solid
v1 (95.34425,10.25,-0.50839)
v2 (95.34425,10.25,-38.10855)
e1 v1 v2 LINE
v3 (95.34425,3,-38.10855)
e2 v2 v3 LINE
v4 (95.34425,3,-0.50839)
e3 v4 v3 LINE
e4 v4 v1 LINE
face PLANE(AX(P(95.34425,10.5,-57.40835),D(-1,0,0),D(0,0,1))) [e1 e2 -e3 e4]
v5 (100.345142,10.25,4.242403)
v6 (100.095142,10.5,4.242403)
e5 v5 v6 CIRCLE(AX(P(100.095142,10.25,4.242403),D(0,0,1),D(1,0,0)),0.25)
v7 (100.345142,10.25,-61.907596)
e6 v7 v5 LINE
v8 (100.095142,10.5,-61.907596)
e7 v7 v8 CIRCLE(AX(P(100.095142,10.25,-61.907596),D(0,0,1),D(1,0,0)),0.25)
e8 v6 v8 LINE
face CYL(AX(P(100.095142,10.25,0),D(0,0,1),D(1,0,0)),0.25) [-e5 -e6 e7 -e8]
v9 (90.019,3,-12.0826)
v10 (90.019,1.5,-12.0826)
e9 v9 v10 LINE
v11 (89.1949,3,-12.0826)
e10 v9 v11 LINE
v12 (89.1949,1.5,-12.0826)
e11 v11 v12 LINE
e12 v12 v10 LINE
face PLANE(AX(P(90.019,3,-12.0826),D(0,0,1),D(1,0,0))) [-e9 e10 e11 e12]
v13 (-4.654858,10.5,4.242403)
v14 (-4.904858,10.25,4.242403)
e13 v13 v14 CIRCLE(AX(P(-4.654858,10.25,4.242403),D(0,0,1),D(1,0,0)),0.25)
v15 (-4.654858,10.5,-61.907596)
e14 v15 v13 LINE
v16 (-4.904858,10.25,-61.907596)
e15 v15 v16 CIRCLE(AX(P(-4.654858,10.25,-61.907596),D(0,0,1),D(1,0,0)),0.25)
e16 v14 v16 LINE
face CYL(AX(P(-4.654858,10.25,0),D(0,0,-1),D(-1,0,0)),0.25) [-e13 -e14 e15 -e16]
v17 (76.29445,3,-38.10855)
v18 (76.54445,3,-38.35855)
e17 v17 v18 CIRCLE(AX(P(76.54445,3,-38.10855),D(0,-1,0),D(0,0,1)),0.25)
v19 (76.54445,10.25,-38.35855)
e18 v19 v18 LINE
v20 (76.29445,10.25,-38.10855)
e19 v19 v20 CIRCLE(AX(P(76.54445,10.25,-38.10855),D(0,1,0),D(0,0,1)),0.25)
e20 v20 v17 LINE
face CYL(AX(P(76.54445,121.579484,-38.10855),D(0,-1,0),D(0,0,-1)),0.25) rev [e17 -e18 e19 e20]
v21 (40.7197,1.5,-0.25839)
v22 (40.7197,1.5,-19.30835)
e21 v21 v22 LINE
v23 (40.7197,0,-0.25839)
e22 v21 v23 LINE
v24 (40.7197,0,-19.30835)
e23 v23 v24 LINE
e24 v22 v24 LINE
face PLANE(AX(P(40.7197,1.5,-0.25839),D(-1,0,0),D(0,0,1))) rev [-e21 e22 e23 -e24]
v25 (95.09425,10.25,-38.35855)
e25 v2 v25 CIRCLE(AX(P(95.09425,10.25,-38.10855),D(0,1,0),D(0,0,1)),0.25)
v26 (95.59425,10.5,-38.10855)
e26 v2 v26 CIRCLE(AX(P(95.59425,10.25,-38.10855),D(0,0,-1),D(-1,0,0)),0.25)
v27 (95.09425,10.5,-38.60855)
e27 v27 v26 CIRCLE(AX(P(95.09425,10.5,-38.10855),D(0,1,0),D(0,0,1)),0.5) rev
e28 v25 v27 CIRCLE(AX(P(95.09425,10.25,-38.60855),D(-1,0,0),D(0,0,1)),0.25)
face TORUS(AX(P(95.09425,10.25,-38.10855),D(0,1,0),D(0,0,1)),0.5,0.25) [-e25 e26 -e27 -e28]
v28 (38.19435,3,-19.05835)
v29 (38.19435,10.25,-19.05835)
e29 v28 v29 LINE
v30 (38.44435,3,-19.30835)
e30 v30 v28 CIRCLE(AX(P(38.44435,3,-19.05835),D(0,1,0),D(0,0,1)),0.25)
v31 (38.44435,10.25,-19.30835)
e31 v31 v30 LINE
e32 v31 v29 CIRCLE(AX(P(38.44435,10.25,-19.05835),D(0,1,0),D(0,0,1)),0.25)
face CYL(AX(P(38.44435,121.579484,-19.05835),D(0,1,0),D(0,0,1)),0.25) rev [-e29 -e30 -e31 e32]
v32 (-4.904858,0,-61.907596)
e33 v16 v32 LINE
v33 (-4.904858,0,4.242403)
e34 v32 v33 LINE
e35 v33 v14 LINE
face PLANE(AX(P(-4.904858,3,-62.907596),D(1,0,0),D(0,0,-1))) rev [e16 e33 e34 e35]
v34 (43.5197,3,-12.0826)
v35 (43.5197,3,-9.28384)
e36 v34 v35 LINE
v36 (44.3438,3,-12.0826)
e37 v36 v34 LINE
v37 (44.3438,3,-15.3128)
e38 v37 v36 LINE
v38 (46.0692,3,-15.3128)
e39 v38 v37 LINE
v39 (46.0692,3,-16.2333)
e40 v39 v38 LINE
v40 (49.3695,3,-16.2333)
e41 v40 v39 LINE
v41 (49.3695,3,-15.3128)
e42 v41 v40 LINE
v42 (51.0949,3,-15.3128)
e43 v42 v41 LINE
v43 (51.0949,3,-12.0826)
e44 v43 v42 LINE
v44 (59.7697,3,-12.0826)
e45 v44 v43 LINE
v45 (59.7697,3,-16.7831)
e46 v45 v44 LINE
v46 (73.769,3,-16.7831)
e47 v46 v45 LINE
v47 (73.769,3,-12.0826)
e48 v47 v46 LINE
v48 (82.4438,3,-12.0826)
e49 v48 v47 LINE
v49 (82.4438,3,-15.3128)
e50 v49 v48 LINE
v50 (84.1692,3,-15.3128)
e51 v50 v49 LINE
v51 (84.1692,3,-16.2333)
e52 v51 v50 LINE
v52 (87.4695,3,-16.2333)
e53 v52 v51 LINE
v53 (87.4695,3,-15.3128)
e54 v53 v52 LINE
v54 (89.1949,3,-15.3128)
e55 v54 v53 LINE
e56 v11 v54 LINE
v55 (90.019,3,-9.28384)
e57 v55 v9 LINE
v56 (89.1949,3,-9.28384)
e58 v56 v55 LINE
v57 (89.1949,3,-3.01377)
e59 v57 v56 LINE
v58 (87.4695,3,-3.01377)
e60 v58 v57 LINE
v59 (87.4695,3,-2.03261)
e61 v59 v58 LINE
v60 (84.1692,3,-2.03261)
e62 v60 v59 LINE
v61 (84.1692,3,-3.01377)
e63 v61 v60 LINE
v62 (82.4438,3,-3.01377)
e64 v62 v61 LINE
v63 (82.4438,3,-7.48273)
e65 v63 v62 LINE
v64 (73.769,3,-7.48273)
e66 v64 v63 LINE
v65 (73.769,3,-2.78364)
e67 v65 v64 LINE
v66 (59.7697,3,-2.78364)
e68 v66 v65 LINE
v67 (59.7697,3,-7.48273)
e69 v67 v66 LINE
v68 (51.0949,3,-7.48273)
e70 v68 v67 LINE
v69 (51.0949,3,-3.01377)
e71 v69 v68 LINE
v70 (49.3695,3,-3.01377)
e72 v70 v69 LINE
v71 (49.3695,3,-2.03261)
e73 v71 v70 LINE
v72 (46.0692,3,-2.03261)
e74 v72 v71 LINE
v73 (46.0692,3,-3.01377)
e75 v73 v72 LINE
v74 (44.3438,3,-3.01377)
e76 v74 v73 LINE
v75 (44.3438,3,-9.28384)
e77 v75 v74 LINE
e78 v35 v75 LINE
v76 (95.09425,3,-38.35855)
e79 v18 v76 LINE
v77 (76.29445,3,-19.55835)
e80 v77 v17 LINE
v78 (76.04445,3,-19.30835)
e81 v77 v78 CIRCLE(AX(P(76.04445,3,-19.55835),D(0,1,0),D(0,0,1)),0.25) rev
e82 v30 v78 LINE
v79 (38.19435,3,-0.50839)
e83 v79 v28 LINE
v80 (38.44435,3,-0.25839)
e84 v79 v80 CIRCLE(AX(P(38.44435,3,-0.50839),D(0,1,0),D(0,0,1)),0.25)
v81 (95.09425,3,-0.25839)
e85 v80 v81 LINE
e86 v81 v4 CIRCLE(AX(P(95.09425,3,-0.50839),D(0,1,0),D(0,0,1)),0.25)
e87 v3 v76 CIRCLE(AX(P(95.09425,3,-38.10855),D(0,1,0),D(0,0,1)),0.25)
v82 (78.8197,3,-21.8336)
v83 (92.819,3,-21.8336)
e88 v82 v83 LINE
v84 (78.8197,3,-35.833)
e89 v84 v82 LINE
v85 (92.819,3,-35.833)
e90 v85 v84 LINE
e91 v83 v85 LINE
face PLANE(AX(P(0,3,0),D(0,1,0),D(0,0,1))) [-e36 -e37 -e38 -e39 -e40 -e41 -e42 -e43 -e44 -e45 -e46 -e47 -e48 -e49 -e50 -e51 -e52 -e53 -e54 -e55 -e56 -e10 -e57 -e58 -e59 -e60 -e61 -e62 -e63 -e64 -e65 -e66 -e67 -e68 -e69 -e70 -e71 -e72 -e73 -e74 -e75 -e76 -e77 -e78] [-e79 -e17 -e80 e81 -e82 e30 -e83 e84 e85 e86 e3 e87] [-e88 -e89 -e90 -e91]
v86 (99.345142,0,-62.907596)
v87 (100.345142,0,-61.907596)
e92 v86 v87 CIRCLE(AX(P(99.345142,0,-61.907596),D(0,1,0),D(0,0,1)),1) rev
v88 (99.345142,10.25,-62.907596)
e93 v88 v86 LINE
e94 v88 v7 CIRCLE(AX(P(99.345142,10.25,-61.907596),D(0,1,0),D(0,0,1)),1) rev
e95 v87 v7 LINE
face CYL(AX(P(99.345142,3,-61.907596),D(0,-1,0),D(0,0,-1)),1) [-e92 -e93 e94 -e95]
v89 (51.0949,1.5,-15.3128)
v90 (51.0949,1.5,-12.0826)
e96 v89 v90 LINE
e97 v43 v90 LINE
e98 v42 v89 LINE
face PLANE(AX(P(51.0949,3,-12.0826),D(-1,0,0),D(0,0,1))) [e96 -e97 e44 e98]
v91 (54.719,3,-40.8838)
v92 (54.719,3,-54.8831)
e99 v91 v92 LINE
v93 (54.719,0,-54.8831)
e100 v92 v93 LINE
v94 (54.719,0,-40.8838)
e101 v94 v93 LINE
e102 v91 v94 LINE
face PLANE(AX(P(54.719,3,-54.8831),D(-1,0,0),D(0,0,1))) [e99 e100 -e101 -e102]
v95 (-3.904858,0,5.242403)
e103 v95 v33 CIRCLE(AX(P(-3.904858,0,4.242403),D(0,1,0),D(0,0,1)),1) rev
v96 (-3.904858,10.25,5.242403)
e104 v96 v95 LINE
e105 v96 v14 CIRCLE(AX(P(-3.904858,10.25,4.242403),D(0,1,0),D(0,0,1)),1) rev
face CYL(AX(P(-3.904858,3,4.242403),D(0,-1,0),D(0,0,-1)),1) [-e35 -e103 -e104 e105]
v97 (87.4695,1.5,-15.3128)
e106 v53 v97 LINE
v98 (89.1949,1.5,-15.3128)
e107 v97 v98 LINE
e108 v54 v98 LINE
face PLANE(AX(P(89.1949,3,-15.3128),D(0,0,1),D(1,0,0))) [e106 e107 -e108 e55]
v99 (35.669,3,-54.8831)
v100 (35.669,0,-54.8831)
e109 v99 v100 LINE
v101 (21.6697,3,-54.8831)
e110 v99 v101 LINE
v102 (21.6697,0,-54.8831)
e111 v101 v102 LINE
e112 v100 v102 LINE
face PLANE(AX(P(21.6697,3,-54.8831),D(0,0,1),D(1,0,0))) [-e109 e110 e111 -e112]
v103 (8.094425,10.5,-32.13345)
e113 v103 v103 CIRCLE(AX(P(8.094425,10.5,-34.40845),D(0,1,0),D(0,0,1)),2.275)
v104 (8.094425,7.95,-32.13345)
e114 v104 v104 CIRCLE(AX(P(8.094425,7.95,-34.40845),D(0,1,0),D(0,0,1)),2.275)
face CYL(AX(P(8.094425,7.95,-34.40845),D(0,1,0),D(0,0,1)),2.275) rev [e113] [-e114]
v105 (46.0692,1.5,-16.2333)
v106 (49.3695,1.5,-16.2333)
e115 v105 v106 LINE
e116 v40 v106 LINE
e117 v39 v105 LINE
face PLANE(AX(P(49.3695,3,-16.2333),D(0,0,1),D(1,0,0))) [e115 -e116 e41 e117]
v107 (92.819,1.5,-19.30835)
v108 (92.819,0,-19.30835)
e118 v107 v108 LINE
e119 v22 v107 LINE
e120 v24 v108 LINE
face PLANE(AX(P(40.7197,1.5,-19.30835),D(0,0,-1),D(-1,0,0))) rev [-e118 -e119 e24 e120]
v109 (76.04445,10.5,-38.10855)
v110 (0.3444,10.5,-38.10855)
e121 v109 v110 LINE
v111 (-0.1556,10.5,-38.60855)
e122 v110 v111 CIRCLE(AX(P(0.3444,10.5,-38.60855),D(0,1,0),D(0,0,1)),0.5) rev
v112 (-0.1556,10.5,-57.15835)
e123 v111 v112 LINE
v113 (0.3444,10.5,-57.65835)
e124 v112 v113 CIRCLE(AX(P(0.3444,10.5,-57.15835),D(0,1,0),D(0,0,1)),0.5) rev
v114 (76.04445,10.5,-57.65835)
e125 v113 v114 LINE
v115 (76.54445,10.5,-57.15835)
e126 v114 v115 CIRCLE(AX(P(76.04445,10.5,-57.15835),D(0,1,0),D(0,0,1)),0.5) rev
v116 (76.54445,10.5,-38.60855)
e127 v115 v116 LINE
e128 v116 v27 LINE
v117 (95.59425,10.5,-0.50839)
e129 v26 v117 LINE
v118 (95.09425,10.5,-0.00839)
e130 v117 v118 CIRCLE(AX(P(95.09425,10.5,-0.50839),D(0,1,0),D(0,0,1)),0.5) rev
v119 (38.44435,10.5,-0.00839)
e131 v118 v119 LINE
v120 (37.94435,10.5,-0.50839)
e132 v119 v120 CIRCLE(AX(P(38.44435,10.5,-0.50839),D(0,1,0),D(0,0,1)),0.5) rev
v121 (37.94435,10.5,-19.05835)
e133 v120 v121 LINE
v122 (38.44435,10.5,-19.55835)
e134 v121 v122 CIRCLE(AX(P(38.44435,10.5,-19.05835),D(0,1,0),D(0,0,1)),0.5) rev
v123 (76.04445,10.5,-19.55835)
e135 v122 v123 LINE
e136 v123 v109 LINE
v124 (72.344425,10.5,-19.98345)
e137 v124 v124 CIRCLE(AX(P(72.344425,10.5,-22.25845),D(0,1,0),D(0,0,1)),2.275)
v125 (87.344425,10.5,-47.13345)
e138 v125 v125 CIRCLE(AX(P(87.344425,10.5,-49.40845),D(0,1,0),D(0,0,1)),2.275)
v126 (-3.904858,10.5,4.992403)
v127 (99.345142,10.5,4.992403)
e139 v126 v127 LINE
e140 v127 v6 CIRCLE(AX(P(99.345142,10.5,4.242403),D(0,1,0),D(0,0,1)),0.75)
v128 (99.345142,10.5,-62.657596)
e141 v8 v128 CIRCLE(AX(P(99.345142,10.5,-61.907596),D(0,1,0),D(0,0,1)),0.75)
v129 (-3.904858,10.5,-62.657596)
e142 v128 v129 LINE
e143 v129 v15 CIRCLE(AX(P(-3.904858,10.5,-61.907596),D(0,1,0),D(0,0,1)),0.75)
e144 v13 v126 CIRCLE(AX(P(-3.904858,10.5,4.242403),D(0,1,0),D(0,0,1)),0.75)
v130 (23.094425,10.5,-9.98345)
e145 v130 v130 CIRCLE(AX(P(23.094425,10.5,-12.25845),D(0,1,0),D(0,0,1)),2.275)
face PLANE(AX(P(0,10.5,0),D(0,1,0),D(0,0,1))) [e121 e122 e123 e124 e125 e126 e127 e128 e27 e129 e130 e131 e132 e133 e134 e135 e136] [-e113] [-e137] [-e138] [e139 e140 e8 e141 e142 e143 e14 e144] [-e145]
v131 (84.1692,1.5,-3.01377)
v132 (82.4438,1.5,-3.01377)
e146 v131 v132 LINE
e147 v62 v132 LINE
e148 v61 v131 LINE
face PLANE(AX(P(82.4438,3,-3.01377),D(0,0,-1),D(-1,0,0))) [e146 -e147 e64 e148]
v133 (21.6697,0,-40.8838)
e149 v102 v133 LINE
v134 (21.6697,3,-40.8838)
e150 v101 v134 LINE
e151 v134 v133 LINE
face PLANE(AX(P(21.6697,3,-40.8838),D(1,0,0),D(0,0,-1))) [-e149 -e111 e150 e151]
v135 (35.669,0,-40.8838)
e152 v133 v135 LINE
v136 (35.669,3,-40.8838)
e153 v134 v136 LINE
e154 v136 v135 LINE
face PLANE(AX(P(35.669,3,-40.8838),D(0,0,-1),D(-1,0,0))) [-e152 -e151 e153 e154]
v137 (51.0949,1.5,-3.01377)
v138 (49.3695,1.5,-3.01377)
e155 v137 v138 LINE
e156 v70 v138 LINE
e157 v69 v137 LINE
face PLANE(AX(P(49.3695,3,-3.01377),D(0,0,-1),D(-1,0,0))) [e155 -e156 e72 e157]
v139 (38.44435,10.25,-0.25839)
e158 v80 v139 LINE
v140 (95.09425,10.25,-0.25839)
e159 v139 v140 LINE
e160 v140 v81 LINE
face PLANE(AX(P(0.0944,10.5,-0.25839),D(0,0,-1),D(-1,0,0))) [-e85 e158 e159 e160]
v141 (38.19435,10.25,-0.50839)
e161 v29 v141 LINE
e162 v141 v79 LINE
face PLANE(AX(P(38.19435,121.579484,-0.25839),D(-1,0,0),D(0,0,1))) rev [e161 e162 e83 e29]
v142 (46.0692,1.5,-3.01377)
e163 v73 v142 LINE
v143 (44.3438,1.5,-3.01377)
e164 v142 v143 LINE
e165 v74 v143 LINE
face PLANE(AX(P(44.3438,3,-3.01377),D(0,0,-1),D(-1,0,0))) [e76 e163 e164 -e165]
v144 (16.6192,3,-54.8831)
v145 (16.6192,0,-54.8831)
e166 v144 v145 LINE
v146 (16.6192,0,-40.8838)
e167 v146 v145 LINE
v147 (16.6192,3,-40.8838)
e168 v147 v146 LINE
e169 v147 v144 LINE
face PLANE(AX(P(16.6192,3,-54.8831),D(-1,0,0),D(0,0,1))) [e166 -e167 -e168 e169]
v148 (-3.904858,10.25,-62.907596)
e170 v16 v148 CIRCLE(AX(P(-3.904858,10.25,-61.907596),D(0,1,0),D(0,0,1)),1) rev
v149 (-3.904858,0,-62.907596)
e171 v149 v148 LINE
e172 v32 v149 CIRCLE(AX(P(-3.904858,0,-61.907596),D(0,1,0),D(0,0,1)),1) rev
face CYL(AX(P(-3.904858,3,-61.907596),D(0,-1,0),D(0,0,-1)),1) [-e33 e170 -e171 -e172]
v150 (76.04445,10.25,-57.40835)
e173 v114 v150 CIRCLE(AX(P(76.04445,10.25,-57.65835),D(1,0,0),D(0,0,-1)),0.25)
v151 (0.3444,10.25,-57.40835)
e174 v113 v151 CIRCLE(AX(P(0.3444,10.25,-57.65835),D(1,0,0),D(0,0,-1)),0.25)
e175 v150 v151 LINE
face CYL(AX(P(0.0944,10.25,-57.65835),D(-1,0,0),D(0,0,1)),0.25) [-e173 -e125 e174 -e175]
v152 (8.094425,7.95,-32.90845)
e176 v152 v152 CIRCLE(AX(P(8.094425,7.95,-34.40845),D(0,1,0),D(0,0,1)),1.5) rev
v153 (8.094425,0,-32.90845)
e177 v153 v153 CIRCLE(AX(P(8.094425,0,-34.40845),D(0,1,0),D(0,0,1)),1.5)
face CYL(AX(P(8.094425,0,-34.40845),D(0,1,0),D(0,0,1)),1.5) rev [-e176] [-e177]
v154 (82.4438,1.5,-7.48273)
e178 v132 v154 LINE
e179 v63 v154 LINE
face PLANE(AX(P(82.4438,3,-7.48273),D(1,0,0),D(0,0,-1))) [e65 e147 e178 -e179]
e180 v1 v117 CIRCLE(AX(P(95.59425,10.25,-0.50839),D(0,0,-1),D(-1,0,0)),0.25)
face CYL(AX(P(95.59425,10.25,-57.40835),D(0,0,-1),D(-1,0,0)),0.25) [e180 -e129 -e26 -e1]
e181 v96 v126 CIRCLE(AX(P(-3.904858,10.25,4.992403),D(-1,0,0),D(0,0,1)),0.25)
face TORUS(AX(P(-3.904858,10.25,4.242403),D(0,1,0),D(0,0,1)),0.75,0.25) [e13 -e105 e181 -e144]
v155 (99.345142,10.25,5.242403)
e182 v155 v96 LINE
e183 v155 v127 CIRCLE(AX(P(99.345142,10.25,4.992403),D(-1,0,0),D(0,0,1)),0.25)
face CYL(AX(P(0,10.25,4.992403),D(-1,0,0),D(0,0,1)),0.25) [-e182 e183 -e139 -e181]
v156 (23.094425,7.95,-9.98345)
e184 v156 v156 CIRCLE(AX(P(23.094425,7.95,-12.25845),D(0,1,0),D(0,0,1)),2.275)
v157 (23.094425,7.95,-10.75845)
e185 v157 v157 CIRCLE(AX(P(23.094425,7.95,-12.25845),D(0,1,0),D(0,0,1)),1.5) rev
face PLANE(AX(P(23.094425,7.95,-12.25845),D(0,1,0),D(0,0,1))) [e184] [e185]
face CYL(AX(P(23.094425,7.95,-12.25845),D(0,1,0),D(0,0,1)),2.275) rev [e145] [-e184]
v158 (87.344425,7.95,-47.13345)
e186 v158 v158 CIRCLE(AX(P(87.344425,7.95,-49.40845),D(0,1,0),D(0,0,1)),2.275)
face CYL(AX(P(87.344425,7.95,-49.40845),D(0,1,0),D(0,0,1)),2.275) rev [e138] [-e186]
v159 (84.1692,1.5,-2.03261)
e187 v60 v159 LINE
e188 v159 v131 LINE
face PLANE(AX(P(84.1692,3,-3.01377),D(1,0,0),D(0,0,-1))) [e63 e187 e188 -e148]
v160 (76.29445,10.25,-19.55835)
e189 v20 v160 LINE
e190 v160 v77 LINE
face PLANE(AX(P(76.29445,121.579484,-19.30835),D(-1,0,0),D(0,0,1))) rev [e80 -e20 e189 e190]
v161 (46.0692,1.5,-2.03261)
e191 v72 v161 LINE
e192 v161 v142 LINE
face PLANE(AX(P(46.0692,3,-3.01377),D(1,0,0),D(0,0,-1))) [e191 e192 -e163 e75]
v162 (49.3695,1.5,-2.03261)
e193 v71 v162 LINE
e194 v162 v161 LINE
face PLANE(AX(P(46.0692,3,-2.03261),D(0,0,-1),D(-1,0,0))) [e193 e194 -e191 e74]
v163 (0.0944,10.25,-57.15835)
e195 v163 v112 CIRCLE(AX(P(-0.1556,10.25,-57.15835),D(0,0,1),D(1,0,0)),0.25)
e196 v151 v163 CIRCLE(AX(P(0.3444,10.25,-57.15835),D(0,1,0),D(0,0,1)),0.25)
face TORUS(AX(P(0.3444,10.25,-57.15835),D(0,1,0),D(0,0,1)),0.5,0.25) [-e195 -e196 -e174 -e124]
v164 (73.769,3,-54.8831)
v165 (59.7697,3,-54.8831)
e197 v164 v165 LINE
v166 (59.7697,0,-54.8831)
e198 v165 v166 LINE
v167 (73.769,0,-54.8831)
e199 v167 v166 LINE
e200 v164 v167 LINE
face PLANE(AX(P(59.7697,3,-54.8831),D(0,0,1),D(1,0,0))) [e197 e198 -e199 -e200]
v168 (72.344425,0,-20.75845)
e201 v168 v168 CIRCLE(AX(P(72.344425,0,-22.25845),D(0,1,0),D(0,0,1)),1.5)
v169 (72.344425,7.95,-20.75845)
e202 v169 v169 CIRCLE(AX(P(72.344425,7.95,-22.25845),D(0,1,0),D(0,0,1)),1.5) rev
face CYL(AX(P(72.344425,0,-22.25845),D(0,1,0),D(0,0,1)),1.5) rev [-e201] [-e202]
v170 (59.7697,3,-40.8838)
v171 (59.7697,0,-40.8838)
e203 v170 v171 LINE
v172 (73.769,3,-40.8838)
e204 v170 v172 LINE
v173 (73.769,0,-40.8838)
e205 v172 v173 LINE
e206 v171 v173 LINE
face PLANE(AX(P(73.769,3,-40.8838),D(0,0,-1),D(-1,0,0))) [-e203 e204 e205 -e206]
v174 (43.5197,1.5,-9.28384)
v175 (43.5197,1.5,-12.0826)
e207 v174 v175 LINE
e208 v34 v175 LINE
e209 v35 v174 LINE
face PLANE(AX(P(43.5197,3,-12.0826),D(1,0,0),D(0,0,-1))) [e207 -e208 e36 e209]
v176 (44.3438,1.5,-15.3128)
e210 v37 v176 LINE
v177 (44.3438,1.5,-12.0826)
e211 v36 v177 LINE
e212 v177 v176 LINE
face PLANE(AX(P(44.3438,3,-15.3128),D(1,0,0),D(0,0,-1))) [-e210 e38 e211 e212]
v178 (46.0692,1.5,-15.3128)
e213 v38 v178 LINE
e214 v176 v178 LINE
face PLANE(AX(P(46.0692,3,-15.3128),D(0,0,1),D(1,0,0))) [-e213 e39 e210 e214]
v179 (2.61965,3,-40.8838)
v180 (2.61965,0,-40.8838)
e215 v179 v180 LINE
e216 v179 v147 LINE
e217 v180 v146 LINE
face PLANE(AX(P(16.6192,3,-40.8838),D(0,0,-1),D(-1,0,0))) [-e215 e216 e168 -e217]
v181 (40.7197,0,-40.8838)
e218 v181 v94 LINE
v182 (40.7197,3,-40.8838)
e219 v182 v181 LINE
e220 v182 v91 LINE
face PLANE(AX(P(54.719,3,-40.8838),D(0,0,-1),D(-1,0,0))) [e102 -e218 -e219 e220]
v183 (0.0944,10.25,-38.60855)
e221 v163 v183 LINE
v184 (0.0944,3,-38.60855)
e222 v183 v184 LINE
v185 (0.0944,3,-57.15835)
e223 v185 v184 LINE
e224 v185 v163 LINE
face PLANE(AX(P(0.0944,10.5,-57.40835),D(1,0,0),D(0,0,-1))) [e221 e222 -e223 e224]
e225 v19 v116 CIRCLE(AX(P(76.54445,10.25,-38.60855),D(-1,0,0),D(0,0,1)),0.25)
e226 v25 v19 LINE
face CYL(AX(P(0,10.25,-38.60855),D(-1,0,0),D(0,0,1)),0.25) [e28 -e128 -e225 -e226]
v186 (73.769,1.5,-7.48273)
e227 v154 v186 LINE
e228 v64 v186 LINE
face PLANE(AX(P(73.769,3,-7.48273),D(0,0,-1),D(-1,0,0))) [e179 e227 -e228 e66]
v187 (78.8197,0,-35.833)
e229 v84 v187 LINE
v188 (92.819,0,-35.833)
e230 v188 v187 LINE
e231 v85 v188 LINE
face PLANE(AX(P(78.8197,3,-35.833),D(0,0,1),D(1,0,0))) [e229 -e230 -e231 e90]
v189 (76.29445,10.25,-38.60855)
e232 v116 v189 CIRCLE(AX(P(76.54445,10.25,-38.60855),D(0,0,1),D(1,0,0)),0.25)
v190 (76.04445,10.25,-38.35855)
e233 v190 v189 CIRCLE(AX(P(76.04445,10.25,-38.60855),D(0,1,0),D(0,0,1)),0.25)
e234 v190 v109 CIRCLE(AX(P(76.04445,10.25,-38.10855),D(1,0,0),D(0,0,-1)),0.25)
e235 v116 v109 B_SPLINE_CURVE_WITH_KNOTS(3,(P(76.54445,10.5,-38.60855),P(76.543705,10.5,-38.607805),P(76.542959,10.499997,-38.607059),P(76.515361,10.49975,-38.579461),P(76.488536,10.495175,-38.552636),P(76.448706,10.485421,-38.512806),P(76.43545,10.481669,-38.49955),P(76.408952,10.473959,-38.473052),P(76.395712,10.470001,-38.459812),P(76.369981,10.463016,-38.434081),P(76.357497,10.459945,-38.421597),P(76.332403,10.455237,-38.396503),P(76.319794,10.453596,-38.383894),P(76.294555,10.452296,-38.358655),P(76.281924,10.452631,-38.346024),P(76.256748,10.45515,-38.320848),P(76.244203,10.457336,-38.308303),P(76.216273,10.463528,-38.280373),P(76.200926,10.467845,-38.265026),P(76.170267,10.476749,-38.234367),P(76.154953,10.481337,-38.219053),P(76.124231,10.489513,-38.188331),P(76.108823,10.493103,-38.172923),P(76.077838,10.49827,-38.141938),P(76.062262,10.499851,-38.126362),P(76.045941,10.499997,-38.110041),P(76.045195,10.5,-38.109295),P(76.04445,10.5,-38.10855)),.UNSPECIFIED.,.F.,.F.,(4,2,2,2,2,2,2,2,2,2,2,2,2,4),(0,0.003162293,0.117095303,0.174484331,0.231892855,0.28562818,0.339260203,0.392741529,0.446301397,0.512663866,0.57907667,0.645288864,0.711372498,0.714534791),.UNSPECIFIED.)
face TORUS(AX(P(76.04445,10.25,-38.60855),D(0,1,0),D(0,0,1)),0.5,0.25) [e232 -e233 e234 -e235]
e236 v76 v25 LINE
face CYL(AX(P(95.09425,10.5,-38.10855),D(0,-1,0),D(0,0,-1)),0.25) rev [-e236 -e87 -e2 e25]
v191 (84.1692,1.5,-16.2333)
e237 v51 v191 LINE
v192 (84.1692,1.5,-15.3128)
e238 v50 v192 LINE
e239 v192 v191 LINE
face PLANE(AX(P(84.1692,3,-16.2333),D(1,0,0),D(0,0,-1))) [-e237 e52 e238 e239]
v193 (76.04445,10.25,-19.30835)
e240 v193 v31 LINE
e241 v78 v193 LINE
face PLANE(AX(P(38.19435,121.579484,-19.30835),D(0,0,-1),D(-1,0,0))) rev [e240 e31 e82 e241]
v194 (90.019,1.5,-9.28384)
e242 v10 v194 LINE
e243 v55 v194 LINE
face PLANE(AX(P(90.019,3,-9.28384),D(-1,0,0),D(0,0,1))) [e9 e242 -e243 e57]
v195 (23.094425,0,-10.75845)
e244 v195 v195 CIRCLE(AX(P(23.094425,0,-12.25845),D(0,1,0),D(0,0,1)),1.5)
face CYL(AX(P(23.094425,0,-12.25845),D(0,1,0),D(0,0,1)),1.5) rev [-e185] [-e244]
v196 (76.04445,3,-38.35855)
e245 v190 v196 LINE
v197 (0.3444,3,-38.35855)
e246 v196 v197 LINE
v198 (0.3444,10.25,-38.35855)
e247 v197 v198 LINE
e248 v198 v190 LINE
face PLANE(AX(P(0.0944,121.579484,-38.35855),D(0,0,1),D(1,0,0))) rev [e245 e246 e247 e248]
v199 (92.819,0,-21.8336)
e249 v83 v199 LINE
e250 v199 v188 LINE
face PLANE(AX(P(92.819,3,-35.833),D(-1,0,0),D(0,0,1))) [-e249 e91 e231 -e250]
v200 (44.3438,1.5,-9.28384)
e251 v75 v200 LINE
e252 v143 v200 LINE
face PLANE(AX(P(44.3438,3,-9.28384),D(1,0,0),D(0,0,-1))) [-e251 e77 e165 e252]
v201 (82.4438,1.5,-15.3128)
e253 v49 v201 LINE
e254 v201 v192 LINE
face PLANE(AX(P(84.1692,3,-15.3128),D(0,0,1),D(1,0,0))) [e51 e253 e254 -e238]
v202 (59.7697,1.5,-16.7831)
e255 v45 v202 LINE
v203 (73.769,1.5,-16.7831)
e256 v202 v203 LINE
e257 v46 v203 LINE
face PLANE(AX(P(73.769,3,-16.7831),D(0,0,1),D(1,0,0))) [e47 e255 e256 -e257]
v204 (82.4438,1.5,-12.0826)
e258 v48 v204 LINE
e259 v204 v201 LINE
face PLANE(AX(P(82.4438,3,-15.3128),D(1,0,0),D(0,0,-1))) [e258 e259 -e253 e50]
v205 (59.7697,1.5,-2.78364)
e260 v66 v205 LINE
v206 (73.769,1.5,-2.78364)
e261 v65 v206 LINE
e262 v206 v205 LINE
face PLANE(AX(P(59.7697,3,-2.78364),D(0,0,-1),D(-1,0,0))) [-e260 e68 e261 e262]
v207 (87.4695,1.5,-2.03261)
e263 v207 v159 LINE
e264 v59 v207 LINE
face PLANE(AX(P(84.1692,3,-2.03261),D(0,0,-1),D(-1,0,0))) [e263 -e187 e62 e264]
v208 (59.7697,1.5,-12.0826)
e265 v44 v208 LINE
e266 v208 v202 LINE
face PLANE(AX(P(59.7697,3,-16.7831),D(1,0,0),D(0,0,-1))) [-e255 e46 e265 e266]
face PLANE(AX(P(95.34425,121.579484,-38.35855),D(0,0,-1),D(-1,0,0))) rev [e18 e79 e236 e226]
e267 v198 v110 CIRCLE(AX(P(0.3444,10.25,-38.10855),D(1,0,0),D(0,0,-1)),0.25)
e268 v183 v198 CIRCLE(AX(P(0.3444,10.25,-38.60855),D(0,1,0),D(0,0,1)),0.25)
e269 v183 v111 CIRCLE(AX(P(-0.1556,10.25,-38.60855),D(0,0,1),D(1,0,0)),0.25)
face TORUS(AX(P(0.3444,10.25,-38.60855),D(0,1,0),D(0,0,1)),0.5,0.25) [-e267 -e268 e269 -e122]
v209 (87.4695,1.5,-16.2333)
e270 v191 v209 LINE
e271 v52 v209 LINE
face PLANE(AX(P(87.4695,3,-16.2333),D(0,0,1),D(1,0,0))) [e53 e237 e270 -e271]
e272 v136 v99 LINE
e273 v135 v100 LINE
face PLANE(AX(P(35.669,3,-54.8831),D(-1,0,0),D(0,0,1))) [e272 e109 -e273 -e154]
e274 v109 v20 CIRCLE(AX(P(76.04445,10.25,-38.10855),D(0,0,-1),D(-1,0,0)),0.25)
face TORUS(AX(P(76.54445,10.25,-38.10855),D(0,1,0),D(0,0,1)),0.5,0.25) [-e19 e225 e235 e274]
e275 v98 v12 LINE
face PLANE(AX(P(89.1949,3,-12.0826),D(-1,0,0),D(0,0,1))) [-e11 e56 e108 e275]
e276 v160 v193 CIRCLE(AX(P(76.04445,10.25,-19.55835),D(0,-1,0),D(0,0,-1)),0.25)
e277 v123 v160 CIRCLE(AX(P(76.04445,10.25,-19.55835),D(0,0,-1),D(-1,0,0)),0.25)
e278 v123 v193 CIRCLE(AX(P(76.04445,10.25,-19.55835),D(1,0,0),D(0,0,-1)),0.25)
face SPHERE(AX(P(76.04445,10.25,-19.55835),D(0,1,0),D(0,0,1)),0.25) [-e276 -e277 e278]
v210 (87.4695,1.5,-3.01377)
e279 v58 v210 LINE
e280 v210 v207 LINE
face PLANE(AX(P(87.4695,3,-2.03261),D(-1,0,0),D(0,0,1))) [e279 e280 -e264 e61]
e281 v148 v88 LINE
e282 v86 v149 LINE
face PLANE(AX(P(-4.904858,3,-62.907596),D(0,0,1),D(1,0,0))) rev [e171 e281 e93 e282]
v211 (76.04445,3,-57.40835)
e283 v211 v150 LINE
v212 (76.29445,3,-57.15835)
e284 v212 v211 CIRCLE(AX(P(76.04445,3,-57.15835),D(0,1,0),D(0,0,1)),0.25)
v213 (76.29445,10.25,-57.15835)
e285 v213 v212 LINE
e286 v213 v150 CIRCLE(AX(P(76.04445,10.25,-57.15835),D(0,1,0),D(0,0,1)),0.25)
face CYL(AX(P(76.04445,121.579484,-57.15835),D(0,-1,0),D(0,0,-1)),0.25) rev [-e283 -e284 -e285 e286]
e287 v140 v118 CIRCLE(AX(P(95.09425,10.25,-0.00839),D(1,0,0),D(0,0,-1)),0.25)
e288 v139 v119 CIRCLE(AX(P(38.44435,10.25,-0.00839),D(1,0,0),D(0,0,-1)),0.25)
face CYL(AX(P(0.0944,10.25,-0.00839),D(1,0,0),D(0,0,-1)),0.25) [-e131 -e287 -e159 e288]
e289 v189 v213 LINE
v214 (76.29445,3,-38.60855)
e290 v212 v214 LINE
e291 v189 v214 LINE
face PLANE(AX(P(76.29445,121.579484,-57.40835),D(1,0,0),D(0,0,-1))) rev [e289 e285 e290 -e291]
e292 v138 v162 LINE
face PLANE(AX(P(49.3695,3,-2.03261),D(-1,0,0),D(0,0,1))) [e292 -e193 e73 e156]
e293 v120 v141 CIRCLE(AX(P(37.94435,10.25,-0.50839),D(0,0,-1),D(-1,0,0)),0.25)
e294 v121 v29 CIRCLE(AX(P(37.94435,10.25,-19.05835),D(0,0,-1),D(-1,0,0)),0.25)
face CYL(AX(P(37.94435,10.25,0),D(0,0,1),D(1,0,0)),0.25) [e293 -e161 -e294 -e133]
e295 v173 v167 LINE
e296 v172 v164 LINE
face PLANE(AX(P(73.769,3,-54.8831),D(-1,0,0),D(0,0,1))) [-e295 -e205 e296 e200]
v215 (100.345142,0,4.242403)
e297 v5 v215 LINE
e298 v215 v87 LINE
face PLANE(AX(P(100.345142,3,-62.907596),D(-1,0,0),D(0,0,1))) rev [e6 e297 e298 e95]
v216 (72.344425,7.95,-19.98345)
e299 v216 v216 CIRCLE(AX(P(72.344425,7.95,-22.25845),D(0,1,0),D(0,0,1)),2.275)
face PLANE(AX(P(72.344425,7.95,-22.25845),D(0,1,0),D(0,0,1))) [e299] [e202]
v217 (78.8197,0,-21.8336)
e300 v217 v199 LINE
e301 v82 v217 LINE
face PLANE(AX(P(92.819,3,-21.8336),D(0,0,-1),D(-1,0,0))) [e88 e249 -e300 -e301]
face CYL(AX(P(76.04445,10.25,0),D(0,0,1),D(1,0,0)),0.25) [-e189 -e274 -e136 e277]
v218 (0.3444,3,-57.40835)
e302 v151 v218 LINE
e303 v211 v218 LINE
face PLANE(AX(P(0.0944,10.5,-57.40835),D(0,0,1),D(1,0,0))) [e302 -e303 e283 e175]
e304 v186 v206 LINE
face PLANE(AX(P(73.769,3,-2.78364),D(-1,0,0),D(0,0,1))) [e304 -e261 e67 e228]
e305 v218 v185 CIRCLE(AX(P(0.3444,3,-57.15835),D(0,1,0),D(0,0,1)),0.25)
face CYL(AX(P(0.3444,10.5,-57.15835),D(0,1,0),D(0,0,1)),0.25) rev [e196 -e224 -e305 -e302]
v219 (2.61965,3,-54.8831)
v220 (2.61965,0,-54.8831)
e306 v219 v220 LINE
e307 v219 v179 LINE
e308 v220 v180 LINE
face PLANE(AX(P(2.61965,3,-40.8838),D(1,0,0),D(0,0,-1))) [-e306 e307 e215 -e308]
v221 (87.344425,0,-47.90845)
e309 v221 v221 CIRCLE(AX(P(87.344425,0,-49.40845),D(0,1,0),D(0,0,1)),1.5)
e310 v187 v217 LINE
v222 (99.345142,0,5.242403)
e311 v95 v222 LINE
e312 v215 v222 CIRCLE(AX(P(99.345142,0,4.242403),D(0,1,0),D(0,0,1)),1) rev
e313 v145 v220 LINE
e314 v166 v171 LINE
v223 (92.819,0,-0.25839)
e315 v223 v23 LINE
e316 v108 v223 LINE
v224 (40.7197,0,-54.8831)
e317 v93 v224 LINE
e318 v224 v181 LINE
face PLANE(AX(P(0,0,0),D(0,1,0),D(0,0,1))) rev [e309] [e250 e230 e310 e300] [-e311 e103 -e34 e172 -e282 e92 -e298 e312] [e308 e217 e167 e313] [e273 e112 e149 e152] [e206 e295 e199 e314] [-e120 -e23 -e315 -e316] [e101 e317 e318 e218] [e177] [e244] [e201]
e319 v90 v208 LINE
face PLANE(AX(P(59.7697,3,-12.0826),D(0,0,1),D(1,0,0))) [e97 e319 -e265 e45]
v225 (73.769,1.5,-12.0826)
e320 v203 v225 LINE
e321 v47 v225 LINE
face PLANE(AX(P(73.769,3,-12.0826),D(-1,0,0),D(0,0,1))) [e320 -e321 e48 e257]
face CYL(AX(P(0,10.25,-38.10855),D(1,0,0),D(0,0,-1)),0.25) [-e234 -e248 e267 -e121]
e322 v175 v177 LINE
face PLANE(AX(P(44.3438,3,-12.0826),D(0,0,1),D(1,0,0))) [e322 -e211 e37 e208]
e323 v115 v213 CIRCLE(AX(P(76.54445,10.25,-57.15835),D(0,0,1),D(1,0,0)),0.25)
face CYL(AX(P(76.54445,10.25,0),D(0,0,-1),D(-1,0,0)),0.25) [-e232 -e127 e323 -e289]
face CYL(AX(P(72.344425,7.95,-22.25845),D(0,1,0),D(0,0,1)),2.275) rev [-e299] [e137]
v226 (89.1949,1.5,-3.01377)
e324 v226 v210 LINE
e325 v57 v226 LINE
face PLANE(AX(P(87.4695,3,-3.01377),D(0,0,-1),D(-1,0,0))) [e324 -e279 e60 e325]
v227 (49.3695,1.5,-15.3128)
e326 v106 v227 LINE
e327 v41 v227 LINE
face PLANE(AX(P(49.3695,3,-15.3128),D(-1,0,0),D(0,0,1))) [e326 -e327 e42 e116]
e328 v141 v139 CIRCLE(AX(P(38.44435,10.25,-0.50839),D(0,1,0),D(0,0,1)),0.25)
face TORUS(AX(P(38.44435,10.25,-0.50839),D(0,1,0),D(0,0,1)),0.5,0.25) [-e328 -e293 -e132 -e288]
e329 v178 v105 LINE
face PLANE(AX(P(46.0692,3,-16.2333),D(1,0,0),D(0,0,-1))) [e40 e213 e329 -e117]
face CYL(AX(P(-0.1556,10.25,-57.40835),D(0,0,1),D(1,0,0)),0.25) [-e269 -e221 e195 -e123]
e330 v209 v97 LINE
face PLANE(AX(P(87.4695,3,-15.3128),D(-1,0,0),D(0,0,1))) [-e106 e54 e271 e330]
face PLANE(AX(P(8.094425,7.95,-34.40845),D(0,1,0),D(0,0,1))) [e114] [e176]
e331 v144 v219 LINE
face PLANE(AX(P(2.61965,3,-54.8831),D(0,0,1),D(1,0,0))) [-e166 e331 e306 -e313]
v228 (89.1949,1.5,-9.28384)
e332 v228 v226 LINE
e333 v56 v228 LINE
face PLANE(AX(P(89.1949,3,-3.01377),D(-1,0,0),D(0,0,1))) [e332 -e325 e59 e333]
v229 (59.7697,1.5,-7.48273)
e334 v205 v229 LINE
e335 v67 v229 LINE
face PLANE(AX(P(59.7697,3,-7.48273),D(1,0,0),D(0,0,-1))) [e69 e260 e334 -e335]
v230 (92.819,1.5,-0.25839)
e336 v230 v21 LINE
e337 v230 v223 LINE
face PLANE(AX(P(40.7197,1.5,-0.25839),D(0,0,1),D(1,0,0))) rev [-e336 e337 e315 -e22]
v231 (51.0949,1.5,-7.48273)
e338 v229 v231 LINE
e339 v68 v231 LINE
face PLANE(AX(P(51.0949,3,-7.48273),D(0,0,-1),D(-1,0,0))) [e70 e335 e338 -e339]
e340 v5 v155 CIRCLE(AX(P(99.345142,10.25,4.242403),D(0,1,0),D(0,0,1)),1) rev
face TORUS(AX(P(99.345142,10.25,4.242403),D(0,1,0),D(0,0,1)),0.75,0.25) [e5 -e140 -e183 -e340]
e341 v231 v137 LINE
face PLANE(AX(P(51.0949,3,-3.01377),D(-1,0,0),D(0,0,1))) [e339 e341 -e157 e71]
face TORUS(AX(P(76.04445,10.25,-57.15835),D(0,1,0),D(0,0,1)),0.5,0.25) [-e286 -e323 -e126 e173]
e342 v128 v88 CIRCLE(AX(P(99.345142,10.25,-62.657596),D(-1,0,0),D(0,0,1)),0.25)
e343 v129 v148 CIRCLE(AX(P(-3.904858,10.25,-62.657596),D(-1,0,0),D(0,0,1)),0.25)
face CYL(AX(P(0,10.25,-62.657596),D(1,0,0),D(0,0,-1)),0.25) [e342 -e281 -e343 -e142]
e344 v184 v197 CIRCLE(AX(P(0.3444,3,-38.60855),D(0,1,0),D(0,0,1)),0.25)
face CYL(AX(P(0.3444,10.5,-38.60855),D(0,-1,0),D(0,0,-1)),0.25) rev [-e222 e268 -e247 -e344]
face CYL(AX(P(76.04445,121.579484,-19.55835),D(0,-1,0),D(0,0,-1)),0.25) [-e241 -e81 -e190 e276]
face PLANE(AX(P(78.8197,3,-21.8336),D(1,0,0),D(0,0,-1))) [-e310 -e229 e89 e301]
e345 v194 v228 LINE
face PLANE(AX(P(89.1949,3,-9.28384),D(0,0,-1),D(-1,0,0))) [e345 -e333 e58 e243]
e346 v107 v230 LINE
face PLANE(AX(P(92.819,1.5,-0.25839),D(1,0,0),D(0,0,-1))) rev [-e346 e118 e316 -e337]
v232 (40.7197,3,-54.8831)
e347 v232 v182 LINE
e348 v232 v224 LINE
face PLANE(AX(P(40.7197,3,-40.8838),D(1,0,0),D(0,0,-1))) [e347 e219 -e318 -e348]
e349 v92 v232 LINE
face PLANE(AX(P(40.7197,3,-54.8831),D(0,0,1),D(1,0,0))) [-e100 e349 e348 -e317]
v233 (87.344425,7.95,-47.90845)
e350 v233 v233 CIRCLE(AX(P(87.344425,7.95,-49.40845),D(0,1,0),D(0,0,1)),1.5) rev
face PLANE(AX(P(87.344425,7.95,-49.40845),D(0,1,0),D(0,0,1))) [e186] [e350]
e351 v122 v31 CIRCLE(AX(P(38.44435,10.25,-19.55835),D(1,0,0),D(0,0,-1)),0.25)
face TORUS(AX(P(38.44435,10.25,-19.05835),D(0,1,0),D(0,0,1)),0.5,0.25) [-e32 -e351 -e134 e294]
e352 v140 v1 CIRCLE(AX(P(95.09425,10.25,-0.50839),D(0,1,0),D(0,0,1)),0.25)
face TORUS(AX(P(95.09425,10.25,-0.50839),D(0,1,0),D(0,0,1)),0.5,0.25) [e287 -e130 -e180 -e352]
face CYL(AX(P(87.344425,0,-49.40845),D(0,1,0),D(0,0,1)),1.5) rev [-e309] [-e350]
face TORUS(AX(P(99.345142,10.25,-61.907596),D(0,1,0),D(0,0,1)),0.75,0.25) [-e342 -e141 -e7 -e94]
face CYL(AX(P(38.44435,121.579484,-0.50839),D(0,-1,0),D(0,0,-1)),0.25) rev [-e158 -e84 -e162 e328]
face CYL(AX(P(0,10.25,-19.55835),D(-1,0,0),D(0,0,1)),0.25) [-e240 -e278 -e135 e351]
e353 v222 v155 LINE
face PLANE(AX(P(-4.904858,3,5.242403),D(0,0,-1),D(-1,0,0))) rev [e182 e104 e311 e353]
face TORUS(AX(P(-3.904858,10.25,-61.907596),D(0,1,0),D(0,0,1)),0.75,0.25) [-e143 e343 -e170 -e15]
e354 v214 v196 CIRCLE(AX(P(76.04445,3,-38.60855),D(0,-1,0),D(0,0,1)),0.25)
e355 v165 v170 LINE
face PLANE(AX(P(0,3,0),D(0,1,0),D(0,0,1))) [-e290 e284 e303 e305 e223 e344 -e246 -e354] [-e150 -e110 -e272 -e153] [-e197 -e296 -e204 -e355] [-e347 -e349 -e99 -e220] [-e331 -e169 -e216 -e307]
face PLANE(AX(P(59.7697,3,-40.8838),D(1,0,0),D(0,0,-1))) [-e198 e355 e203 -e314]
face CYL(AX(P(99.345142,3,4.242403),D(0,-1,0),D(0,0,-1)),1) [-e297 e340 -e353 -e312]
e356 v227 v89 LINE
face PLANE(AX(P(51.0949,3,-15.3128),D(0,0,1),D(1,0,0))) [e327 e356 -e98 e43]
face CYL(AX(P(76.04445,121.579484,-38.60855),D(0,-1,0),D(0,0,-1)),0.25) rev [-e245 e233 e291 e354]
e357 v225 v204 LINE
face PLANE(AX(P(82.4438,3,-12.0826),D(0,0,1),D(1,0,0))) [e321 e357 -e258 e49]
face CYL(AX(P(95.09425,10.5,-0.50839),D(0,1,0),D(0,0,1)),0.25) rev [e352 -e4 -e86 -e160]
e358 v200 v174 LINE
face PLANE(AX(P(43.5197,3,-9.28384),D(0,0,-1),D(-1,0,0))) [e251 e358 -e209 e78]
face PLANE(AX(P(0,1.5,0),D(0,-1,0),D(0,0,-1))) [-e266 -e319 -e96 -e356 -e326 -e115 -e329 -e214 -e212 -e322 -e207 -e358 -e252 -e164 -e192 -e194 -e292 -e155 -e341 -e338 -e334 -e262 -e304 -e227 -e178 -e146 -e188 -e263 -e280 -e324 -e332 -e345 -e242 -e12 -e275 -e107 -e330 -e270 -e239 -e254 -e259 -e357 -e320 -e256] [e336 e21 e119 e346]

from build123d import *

# Parameters (mm, degrees)
SKETCH5_W           = 105.25
SKETCH5_H           = 68.15
SKETCH5_W_2         = 13.9993
SKETCH5_H_2         = 13.9994
SKETCH5_H_3         = 13.9993
SKETCH5_W_3         = 13.99955
BOSS_EXTRUDE1_DEPTH = 3
SKETCH6_W           = 52.0993
SKETCH6_H           = 19.04996
CUT_EXTRUDE1_DEPTH  = 1.5
SKETCH7_W           = 105.25
SKETCH7_H           = 68.15
SKETCH7_W_2         = 95.24985
SKETCH7_H_2         = 57.14996
BOSS_EXTRUDE2_DEPTH = 7.5
SKETCH9_R           = 1.5
CUT_EXTRUDE3_DEPTH  = 119.670818994
BOSS_EXTRUDE4_START = 7.5
SKETCH10_R          = 1.5
BOSS_EXTRUDE4_DEPTH = 7.5
SKETCH13_R          = 2.275
CUT_EXTRUDE5_DEPTH  = 2.55
FILLET1_R           = 0.25
FILLET2_R           = 1
FILLET3_R           = 0.25


with BuildPart() as part:
    # Sketch5 → Boss-Extrude1 (new body)
    with BuildSketch(Plane(origin=(0, 0, 0), x_dir=(1, 0, 0), z_dir=(0, 1, 0))):
        with Locations((47.7201423, 28.8325965)):
            Rectangle(SKETCH5_W, SKETCH5_H)
        Polygon((82.4438, 7.48273), (82.4438, 3.01377), (84.1692, 3.01377), (84.1692, 2.03261), (87.4695, 2.03261), (87.4695, 3.01377), (89.1949, 3.01377), (89.1949, 9.28384), (90.019, 9.28384), (90.019, 12.0826), (89.1949, 12.0826), (89.1949, 15.3128), (87.4695, 15.3128), (87.4695, 16.2333), (84.1692, 16.2333), (84.1692, 15.3128), (82.4438, 15.3128), (82.4438, 12.0826), (73.769, 12.0826), (73.769, 16.7831), (59.7697, 16.7831), (59.7697, 12.0826), (51.0949, 12.0826), (51.0949, 15.3128), (49.3695, 15.3128), (49.3695, 16.2333), (46.0692, 16.2333), (46.0692, 15.3128), (44.3438, 15.3128), (44.3438, 12.0826), (43.5197, 12.0826), (43.5197, 9.28384), (44.3438, 9.28384), (44.3438, 3.01377), (46.0692, 3.01377), (46.0692, 2.03261), (49.3695, 2.03261), (49.3695, 3.01377), (51.0949, 3.01377), (51.0949, 7.48273), (59.7697, 7.48273), (59.7697, 2.78364), (73.769, 2.78364), (73.769, 7.48273), align=None, mode=Mode.SUBTRACT)
        with Locations((85.81935, 28.8333)):
            Rectangle(SKETCH5_W_2, SKETCH5_H_2, mode=Mode.SUBTRACT)
        with Locations((66.76935, 47.88345)):
            Rectangle(SKETCH5_W_2, SKETCH5_H_3, mode=Mode.SUBTRACT)
        with Locations((47.71935, 47.88345)):
            Rectangle(SKETCH5_W_2, SKETCH5_H_3, mode=Mode.SUBTRACT)
        with Locations((28.66935, 47.88345)):
            Rectangle(SKETCH5_W_2, SKETCH5_H_3, mode=Mode.SUBTRACT)
        with Locations((9.619425, 47.88345)):
            Rectangle(SKETCH5_W_3, SKETCH5_H_3, mode=Mode.SUBTRACT)
    extrude(amount=BOSS_EXTRUDE1_DEPTH)

    # Sketch6 → Cut-Extrude1 (cut)
    with BuildSketch(Plane.XZ):
        with Locations((66.76935, -9.78337)):
            Rectangle(SKETCH6_W, SKETCH6_H)
    extrude(amount=-CUT_EXTRUDE1_DEPTH, mode=Mode.SUBTRACT)

    # Sketch7 → Boss-Extrude2 (add)
    with BuildSketch(Plane(origin=(0, 3, 0), x_dir=(1, 0, 0), z_dir=(0, 1, 0))):
        with Locations((47.7201423, 28.8325965)):
            Rectangle(SKETCH7_W, SKETCH7_H)
        with Locations((47.719325, 28.83337)):
            Rectangle(SKETCH7_W_2, SKETCH7_H_2, mode=Mode.SUBTRACT)
    extrude(amount=BOSS_EXTRUDE2_DEPTH)

    # Sketch9 → Cut-Extrude3 (cut, through all)
    with BuildSketch(Plane(origin=(0, 3, 0), x_dir=(1, 0, 0), z_dir=(0, 1, 0))):
        with Locations(Location((8.094425, 34.40845, 0), (0, 0, 270))):
            Circle(SKETCH9_R)
        with Locations(Location((23.094425, 12.25845, 0), (0, 0, 270))):
            Circle(SKETCH9_R)
        with Locations(Location((87.344425, 49.40845, 0), (0, 0, 270))):
            Circle(SKETCH9_R)
        with Locations(Location((72.344425, 22.25845, 0), (0, 0, 270))):
            Circle(SKETCH9_R)
    extrude(amount=-CUT_EXTRUDE3_DEPTH, mode=Mode.SUBTRACT)

    # Sketch10 → Boss-Extrude4 (add)
    with BuildSketch(Plane(origin=(0, 3, 0), x_dir=(1, 0, 0), z_dir=(0, 1, 0)).offset(BOSS_EXTRUDE4_START)):
        with BuildLine():
            Line((0.0944, 0.25839), (0.0944, 38.35855))
            Line((0.0944, 38.35855), (76.04445, 38.35855))
            ThreePointArc((76.04445, 38.35855), (76.221226695, 38.431773305), (76.29445, 38.60855))
            Line((76.29445, 38.60855), (76.29445, 57.40835))
            Line((76.29445, 57.40835), (95.34425, 57.40835))
            Line((95.34425, 57.40835), (95.34425, 38.35855))
            Line((95.34425, 38.35855), (76.54445, 38.35855))
            ThreePointArc((76.54445, 38.35855), (76.367673305, 38.285326695), (76.29445, 38.10855))
            Line((76.29445, 38.10855), (76.29445, 19.30835))
            Line((76.29445, 19.30835), (38.19435, 19.30835))
            Line((38.19435, 19.30835), (38.19435, 0.25839))
            Line((38.19435, 0.25839), (0.0944, 0.25839))
        make_face()
        with Locations(Location((87.344425, 49.40845, 0), (0, 0, 270))):
            Circle(SKETCH10_R, mode=Mode.SUBTRACT)
        with Locations(Location((72.344425, 22.25845, 0), (0, 0, 270))):
            Circle(SKETCH10_R, mode=Mode.SUBTRACT)
        with Locations(Location((8.094425, 34.40845, 0), (0, 0, 270))):
            Circle(SKETCH10_R, mode=Mode.SUBTRACT)
        with Locations(Location((23.094425, 12.25845, 0), (0, 0, 270))):
            Circle(SKETCH10_R, mode=Mode.SUBTRACT)
    extrude(amount=-BOSS_EXTRUDE4_DEPTH)

    # Sketch13 → Cut-Extrude5 (cut)
    with BuildSketch(Plane(origin=(0, 10.5, 0), x_dir=(1, 0, 0), z_dir=(0, 1, 0))):
        with Locations(Location((8.094425, 34.40845, 0), (0, 0, 270))):
            Circle(SKETCH13_R)
        with Locations(Location((23.094425, 12.25845, 0), (0, 0, 270))):
            Circle(SKETCH13_R)
        with Locations(Location((87.344425, 49.40845, 0), (0, 0, 270))):
            Circle(SKETCH13_R)
        with Locations(Location((72.344425, 22.25845, 0), (0, 0, 270))):
            Circle(SKETCH13_R)
    extrude(amount=-CUT_EXTRUDE5_DEPTH, mode=Mode.SUBTRACT)

    # Fillet1
    fillet1_edges = [part.edges().sort_by_distance(p)[0] for p in [
        (95.34425, 6.75, -0.25839),
        (0.0944, 6.75, -57.40835),
        (76.29445, 6.75, -57.40835),
        (95.34425, 6.75, -38.35855),
        (76.29445, 6.75, -19.30835),
        (38.19435, 6.75, -19.30835),
        (38.19435, 6.75, -0.25839),
        (0.0944, 6.75, -38.35855),
    ]]
    fillet(fillet1_edges, radius=FILLET1_R)

    # Fillet2
    fillet2_edges = [part.edges().sort_by_distance(p)[0] for p in [
        (-4.9048577, 5.25, -62.9075965),
        (100.3451423, 5.25, -62.9075965),
        (100.3451423, 5.25, 5.2424035),
        (-4.9048577, 5.25, 5.2424035),
    ]]
    fillet(fillet2_edges, radius=FILLET2_R)

    # Fillet3
    # the kernel refuses this fillet: 0.25 mm, written as the material it takes off along each edge
    with BuildSketch(Plane(origin=(76.04445, 10.5, -38.60855), x_dir=(0, 0, 1), z_dir=(-1, 0, 0))) as fillet3_piece_1:
        with BuildLine():
            CenterArc((0.25 + FILLET3_R, -FILLET3_R), FILLET3_R, 90, 90)
            Line((0.25, -FILLET3_R), (0.25, 0))
            Line((0.25, 0), (0.25 + FILLET3_R, 0))
        make_face()
    revolve(axis=Axis((76.04445, 10.5, -38.60855), (0, 1, 0)), revolution_arc=90, mode=Mode.SUBTRACT)
    with BuildSketch(Plane(origin=(0.3444, 10.5, -38.35855), x_dir=(0, 0, 1), z_dir=(1, 0, 0))) as fillet3_piece_2:
        with BuildLine():
            CenterArc((FILLET3_R, FILLET3_R), FILLET3_R, 180, 90)
            Line((0, FILLET3_R), (0, 0))
            Line((0, 0), (FILLET3_R, 0))
        make_face()
    extrude(amount=75.70005, mode=Mode.SUBTRACT)
    with BuildSketch(Plane(origin=(76.54445, 10.5, -38.10855), x_dir=(0, 0, -1), z_dir=(1, 0, 0))) as fillet3_piece_3:
        with BuildLine():
            CenterArc((0.25 + FILLET3_R, -FILLET3_R), FILLET3_R, 90, 90)
            Line((0.25, -FILLET3_R), (0.25, 0))
            Line((0.25, 0), (0.25 + FILLET3_R, 0))
        make_face()
    revolve(axis=Axis((76.54445, 10.5, -38.10855), (0, 1, 0)), revolution_arc=90, mode=Mode.SUBTRACT)
    with BuildSketch(Plane(origin=(95.09425, 10.5, -38.35855), x_dir=(0, 0, -1), z_dir=(-1, 0, 0)), Plane(origin=(76.29445, 10.5, -38.60855), x_dir=(1, 0, 0), z_dir=(0, 0, -1))) as fillet3_piece_4:
        with BuildLine():
            CenterArc((FILLET3_R, FILLET3_R), FILLET3_R, 180, 90)
            Line((0, FILLET3_R), (0, 0))
            Line((0, 0), (FILLET3_R, 0))
        make_face()
    extrude(amount=18.5498, mode=Mode.SUBTRACT)
    with BuildSketch(Plane(origin=(95.09425, 10.5, -0.25839), x_dir=(0, 0, 1), z_dir=(-1, 0, 0))) as fillet3_piece_5:
        with BuildLine():
            CenterArc((FILLET3_R, -FILLET3_R), FILLET3_R, 90, 90)
            Line((0, -FILLET3_R), (0, 0))
            Line((0, 0), (FILLET3_R, 0))
        make_face()
    extrude(amount=56.6499, mode=Mode.SUBTRACT)
    with BuildSketch(Plane(origin=(95.34425, 10.5, -38.10855), x_dir=(1, 0, 0), z_dir=(0, 0, 1))) as fillet3_piece_6:
        with BuildLine():
            CenterArc((FILLET3_R, -FILLET3_R), FILLET3_R, 90, 90)
            Line((0, -FILLET3_R), (0, 0))
            Line((0, 0), (FILLET3_R, 0))
        make_face()
    extrude(amount=37.60016, mode=Mode.SUBTRACT)
    with BuildSketch(Plane(origin=(38.19435, 10.5, -19.05835), x_dir=(-1, 0, 0), z_dir=(0, 0, 1))) as fillet3_piece_7:
        with BuildLine():
            CenterArc((FILLET3_R, FILLET3_R), FILLET3_R, 180, 90)
            Line((0, FILLET3_R), (0, 0))
            Line((0, 0), (FILLET3_R, 0))
        make_face()
    extrude(amount=18.54996, mode=Mode.SUBTRACT)
    with BuildSketch(Plane(origin=(76.04445, 10.5, -19.30835), x_dir=(0, 0, -1), z_dir=(-1, 0, 0))) as fillet3_piece_8:
        with BuildLine():
            CenterArc((FILLET3_R, FILLET3_R), FILLET3_R, 180, 90)
            Line((0, FILLET3_R), (0, 0))
            Line((0, 0), (FILLET3_R, 0))
        make_face()
    extrude(amount=37.6001, mode=Mode.SUBTRACT)
    with BuildSketch(Plane(origin=(76.29445, 10.5, -38.10855), x_dir=(-1, 0, 0), z_dir=(0, 0, 1))) as fillet3_piece_9:
        with BuildLine():
            CenterArc((FILLET3_R, FILLET3_R), FILLET3_R, 180, 90)
            Line((0, FILLET3_R), (0, 0))
            Line((0, 0), (FILLET3_R, 0))
        make_face()
    extrude(amount=18.5502, mode=Mode.SUBTRACT)
    with BuildSketch(Plane(origin=(0.0944, 10.5, -38.60855), x_dir=(-1, 0, 0), z_dir=(0, 0, -1))) as fillet3_piece_10:
        with BuildLine():
            CenterArc((FILLET3_R, -FILLET3_R), FILLET3_R, 90, 90)
            Line((0, -FILLET3_R), (0, 0))
            Line((0, 0), (FILLET3_R, 0))
        make_face()
    extrude(amount=18.5498, mode=Mode.SUBTRACT)
    with BuildSketch(Plane(origin=(0.3444, 10.5, -57.40835), x_dir=(0, 0, -1), z_dir=(1, 0, 0))) as fillet3_piece_11:
        with BuildLine():
            CenterArc((FILLET3_R, -FILLET3_R), FILLET3_R, 90, 90)
            Line((0, -FILLET3_R), (0, 0))
            Line((0, 0), (FILLET3_R, 0))
        make_face()
    extrude(amount=75.70005, mode=Mode.SUBTRACT)
    with BuildSketch(Plane(origin=(76.04445, 10.5, -19.55835), x_dir=(1, 0, 0), z_dir=(0, 0, -1))) as fillet3_piece_12:
        with BuildLine():
            CenterArc((0.25 - FILLET3_R, FILLET3_R), FILLET3_R, 270, 90)
            Line((0.25, FILLET3_R), (0.25, 0))
            Line((0.25, 0), (0.25 - FILLET3_R, 0))
        make_face()
    revolve(axis=Axis((76.04445, 10.5, -19.55835), (0, -1, 0)), revolution_arc=90, mode=Mode.SUBTRACT)
    with BuildSketch(Plane(origin=(95.09425, 10.5, -0.50839), x_dir=(1, 0, 0), z_dir=(0, 0, -1))) as fillet3_piece_13:
        with BuildLine():
            CenterArc((0.25 + FILLET3_R, FILLET3_R), FILLET3_R, 180, 90)
            Line((0.25, FILLET3_R), (0.25, 0))
            Line((0.25, 0), (0.25 + FILLET3_R, 0))
        make_face()
    revolve(axis=Axis((95.09425, 10.5, -0.50839), (0, -1, 0)), revolution_arc=90, mode=Mode.SUBTRACT)
    with BuildSketch(Plane(origin=(38.44435, 10.5, -0.50839), x_dir=(0, 0, 1), z_dir=(1, 0, 0))) as fillet3_piece_14:
        with BuildLine():
            CenterArc((0.25 + FILLET3_R, FILLET3_R), FILLET3_R, 180, 90)
            Line((0.25, FILLET3_R), (0.25, 0))
            Line((0.25, 0), (0.25 + FILLET3_R, 0))
        make_face()
    revolve(axis=Axis((38.44435, 10.5, -0.50839), (0, -1, 0)), revolution_arc=90, mode=Mode.SUBTRACT)
    with BuildSketch(Plane(origin=(38.44435, 10.5, -19.05835), x_dir=(-1, 0, 0), z_dir=(0, 0, 1))) as fillet3_piece_15:
        with BuildLine():
            CenterArc((0.25 + FILLET3_R, FILLET3_R), FILLET3_R, 180, 90)
            Line((0.25, FILLET3_R), (0.25, 0))
            Line((0.25, 0), (0.25 + FILLET3_R, 0))
        make_face()
    revolve(axis=Axis((38.44435, 10.5, -19.05835), (0, -1, 0)), revolution_arc=90, mode=Mode.SUBTRACT)
    with BuildSketch(Plane(origin=(95.09425, 10.5, -38.10855), x_dir=(1, 0, 0), z_dir=(0, 0, 1))) as fillet3_piece_16:
        with BuildLine():
            CenterArc((0.25 + FILLET3_R, -FILLET3_R), FILLET3_R, 90, 90)
            Line((0.25, -FILLET3_R), (0.25, 0))
            Line((0.25, 0), (0.25 + FILLET3_R, 0))
        make_face()
    revolve(axis=Axis((95.09425, 10.5, -38.10855), (0, 1, 0)), revolution_arc=90, mode=Mode.SUBTRACT)
    with BuildSketch(Plane(origin=(76.04445, 10.5, -57.15835), x_dir=(0, 0, -1), z_dir=(-1, 0, 0))) as fillet3_piece_17:
        with BuildLine():
            CenterArc((0.25 + FILLET3_R, FILLET3_R), FILLET3_R, 180, 90)
            Line((0.25, FILLET3_R), (0.25, 0))
            Line((0.25, 0), (0.25 + FILLET3_R, 0))
        make_face()
    revolve(axis=Axis((76.04445, 10.5, -57.15835), (0, -1, 0)), revolution_arc=90, mode=Mode.SUBTRACT)
    with BuildSketch(Plane(origin=(0.3444, 10.5, -38.60855), x_dir=(-1, 0, 0), z_dir=(0, 0, -1))) as fillet3_piece_18:
        with BuildLine():
            CenterArc((0.25 + FILLET3_R, -FILLET3_R), FILLET3_R, 90, 90)
            Line((0.25, -FILLET3_R), (0.25, 0))
            Line((0.25, 0), (0.25 + FILLET3_R, 0))
        make_face()
    revolve(axis=Axis((0.3444, 10.5, -38.60855), (0, 1, 0)), revolution_arc=90, mode=Mode.SUBTRACT)
    with BuildSketch(Plane(origin=(0.3444, 10.5, -57.15835), x_dir=(0, 0, -1), z_dir=(1, 0, 0))) as fillet3_piece_19:
        with BuildLine():
            CenterArc((0.25 + FILLET3_R, -FILLET3_R), FILLET3_R, 90, 90)
            Line((0.25, -FILLET3_R), (0.25, 0))
            Line((0.25, 0), (0.25 + FILLET3_R, 0))
        make_face()
    revolve(axis=Axis((0.3444, 10.5, -57.15835), (0, 1, 0)), revolution_arc=90, mode=Mode.SUBTRACT)
    with BuildSketch(Plane(origin=(99.3451423, 10.5, -62.9075965), x_dir=(0, 0, 1), z_dir=(-1, 0, 0)), Plane(origin=(-3.9048577, 10.5, 5.2424035), x_dir=(0, 0, -1), z_dir=(1, 0, 0))) as fillet3_piece_20:
        with BuildLine():
            CenterArc((FILLET3_R, -FILLET3_R), FILLET3_R, 90, 90)
            Line((0, -FILLET3_R), (0, 0))
            Line((0, 0), (FILLET3_R, 0))
        make_face()
    extrude(amount=103.25, mode=Mode.SUBTRACT)
    with BuildSketch(Plane(origin=(100.3451423, 10.5, 4.2424035), x_dir=(-1, 0, 0), z_dir=(0, 0, -1)), Plane(origin=(-4.9048577, 10.5, -61.9075965), x_dir=(1, 0, 0), z_dir=(0, 0, 1))) as fillet3_piece_21:
        with BuildLine():
            CenterArc((FILLET3_R, -FILLET3_R), FILLET3_R, 90, 90)
            Line((0, -FILLET3_R), (0, 0))
            Line((0, 0), (FILLET3_R, 0))
        make_face()
    extrude(amount=66.15, mode=Mode.SUBTRACT)
    with BuildSketch(Plane(origin=(-3.9048577, 10.5, -61.9075965), x_dir=(0, 0, -1), z_dir=(1, 0, 0))) as fillet3_piece_22:
        with BuildLine():
            CenterArc((1 - FILLET3_R, -FILLET3_R), FILLET3_R, 0, 90)
            Line((1, -FILLET3_R), (1, 0))
            Line((1, 0), (1 - FILLET3_R, 0))
        make_face()
    revolve(axis=Axis((-3.9048577, 10.5, -61.9075965), (0, 1, 0)), revolution_arc=90, mode=Mode.SUBTRACT)
    with BuildSketch(Plane(origin=(-3.9048577, 10.5, 4.2424035), x_dir=(0, 0, 1), z_dir=(1, 0, 0))) as fillet3_piece_23:
        with BuildLine():
            CenterArc((1 - FILLET3_R, FILLET3_R), FILLET3_R, 270, 90)
            Line((1, FILLET3_R), (1, 0))
            Line((1, 0), (1 - FILLET3_R, 0))
        make_face()
    revolve(axis=Axis((-3.9048577, 10.5, 4.2424035), (0, -1, 0)), revolution_arc=90, mode=Mode.SUBTRACT)
    with BuildSketch(Plane(origin=(99.3451423, 10.5, 4.2424035), x_dir=(1, 0, 0), z_dir=(0, 0, -1))) as fillet3_piece_24:
        with BuildLine():
            CenterArc((1 - FILLET3_R, FILLET3_R), FILLET3_R, 270, 90)
            Line((1, FILLET3_R), (1, 0))
            Line((1, 0), (1 - FILLET3_R, 0))
        make_face()
    revolve(axis=Axis((99.3451423, 10.5, 4.2424035), (0, -1, 0)), revolution_arc=90, mode=Mode.SUBTRACT)
    with BuildSketch(Plane(origin=(99.3451423, 10.5, -61.9075965), x_dir=(1, 0, 0), z_dir=(0, 0, 1))) as fillet3_piece_25:
        with BuildLine():
            CenterArc((1 - FILLET3_R, -FILLET3_R), FILLET3_R, 0, 90)
            Line((1, -FILLET3_R), (1, 0))
            Line((1, 0), (1 - FILLET3_R, 0))
        make_face()
    revolve(axis=Axis((99.3451423, 10.5, -61.9075965), (0, 1, 0)), revolution_arc=90, mode=Mode.SUBTRACT)


solid = part.part
